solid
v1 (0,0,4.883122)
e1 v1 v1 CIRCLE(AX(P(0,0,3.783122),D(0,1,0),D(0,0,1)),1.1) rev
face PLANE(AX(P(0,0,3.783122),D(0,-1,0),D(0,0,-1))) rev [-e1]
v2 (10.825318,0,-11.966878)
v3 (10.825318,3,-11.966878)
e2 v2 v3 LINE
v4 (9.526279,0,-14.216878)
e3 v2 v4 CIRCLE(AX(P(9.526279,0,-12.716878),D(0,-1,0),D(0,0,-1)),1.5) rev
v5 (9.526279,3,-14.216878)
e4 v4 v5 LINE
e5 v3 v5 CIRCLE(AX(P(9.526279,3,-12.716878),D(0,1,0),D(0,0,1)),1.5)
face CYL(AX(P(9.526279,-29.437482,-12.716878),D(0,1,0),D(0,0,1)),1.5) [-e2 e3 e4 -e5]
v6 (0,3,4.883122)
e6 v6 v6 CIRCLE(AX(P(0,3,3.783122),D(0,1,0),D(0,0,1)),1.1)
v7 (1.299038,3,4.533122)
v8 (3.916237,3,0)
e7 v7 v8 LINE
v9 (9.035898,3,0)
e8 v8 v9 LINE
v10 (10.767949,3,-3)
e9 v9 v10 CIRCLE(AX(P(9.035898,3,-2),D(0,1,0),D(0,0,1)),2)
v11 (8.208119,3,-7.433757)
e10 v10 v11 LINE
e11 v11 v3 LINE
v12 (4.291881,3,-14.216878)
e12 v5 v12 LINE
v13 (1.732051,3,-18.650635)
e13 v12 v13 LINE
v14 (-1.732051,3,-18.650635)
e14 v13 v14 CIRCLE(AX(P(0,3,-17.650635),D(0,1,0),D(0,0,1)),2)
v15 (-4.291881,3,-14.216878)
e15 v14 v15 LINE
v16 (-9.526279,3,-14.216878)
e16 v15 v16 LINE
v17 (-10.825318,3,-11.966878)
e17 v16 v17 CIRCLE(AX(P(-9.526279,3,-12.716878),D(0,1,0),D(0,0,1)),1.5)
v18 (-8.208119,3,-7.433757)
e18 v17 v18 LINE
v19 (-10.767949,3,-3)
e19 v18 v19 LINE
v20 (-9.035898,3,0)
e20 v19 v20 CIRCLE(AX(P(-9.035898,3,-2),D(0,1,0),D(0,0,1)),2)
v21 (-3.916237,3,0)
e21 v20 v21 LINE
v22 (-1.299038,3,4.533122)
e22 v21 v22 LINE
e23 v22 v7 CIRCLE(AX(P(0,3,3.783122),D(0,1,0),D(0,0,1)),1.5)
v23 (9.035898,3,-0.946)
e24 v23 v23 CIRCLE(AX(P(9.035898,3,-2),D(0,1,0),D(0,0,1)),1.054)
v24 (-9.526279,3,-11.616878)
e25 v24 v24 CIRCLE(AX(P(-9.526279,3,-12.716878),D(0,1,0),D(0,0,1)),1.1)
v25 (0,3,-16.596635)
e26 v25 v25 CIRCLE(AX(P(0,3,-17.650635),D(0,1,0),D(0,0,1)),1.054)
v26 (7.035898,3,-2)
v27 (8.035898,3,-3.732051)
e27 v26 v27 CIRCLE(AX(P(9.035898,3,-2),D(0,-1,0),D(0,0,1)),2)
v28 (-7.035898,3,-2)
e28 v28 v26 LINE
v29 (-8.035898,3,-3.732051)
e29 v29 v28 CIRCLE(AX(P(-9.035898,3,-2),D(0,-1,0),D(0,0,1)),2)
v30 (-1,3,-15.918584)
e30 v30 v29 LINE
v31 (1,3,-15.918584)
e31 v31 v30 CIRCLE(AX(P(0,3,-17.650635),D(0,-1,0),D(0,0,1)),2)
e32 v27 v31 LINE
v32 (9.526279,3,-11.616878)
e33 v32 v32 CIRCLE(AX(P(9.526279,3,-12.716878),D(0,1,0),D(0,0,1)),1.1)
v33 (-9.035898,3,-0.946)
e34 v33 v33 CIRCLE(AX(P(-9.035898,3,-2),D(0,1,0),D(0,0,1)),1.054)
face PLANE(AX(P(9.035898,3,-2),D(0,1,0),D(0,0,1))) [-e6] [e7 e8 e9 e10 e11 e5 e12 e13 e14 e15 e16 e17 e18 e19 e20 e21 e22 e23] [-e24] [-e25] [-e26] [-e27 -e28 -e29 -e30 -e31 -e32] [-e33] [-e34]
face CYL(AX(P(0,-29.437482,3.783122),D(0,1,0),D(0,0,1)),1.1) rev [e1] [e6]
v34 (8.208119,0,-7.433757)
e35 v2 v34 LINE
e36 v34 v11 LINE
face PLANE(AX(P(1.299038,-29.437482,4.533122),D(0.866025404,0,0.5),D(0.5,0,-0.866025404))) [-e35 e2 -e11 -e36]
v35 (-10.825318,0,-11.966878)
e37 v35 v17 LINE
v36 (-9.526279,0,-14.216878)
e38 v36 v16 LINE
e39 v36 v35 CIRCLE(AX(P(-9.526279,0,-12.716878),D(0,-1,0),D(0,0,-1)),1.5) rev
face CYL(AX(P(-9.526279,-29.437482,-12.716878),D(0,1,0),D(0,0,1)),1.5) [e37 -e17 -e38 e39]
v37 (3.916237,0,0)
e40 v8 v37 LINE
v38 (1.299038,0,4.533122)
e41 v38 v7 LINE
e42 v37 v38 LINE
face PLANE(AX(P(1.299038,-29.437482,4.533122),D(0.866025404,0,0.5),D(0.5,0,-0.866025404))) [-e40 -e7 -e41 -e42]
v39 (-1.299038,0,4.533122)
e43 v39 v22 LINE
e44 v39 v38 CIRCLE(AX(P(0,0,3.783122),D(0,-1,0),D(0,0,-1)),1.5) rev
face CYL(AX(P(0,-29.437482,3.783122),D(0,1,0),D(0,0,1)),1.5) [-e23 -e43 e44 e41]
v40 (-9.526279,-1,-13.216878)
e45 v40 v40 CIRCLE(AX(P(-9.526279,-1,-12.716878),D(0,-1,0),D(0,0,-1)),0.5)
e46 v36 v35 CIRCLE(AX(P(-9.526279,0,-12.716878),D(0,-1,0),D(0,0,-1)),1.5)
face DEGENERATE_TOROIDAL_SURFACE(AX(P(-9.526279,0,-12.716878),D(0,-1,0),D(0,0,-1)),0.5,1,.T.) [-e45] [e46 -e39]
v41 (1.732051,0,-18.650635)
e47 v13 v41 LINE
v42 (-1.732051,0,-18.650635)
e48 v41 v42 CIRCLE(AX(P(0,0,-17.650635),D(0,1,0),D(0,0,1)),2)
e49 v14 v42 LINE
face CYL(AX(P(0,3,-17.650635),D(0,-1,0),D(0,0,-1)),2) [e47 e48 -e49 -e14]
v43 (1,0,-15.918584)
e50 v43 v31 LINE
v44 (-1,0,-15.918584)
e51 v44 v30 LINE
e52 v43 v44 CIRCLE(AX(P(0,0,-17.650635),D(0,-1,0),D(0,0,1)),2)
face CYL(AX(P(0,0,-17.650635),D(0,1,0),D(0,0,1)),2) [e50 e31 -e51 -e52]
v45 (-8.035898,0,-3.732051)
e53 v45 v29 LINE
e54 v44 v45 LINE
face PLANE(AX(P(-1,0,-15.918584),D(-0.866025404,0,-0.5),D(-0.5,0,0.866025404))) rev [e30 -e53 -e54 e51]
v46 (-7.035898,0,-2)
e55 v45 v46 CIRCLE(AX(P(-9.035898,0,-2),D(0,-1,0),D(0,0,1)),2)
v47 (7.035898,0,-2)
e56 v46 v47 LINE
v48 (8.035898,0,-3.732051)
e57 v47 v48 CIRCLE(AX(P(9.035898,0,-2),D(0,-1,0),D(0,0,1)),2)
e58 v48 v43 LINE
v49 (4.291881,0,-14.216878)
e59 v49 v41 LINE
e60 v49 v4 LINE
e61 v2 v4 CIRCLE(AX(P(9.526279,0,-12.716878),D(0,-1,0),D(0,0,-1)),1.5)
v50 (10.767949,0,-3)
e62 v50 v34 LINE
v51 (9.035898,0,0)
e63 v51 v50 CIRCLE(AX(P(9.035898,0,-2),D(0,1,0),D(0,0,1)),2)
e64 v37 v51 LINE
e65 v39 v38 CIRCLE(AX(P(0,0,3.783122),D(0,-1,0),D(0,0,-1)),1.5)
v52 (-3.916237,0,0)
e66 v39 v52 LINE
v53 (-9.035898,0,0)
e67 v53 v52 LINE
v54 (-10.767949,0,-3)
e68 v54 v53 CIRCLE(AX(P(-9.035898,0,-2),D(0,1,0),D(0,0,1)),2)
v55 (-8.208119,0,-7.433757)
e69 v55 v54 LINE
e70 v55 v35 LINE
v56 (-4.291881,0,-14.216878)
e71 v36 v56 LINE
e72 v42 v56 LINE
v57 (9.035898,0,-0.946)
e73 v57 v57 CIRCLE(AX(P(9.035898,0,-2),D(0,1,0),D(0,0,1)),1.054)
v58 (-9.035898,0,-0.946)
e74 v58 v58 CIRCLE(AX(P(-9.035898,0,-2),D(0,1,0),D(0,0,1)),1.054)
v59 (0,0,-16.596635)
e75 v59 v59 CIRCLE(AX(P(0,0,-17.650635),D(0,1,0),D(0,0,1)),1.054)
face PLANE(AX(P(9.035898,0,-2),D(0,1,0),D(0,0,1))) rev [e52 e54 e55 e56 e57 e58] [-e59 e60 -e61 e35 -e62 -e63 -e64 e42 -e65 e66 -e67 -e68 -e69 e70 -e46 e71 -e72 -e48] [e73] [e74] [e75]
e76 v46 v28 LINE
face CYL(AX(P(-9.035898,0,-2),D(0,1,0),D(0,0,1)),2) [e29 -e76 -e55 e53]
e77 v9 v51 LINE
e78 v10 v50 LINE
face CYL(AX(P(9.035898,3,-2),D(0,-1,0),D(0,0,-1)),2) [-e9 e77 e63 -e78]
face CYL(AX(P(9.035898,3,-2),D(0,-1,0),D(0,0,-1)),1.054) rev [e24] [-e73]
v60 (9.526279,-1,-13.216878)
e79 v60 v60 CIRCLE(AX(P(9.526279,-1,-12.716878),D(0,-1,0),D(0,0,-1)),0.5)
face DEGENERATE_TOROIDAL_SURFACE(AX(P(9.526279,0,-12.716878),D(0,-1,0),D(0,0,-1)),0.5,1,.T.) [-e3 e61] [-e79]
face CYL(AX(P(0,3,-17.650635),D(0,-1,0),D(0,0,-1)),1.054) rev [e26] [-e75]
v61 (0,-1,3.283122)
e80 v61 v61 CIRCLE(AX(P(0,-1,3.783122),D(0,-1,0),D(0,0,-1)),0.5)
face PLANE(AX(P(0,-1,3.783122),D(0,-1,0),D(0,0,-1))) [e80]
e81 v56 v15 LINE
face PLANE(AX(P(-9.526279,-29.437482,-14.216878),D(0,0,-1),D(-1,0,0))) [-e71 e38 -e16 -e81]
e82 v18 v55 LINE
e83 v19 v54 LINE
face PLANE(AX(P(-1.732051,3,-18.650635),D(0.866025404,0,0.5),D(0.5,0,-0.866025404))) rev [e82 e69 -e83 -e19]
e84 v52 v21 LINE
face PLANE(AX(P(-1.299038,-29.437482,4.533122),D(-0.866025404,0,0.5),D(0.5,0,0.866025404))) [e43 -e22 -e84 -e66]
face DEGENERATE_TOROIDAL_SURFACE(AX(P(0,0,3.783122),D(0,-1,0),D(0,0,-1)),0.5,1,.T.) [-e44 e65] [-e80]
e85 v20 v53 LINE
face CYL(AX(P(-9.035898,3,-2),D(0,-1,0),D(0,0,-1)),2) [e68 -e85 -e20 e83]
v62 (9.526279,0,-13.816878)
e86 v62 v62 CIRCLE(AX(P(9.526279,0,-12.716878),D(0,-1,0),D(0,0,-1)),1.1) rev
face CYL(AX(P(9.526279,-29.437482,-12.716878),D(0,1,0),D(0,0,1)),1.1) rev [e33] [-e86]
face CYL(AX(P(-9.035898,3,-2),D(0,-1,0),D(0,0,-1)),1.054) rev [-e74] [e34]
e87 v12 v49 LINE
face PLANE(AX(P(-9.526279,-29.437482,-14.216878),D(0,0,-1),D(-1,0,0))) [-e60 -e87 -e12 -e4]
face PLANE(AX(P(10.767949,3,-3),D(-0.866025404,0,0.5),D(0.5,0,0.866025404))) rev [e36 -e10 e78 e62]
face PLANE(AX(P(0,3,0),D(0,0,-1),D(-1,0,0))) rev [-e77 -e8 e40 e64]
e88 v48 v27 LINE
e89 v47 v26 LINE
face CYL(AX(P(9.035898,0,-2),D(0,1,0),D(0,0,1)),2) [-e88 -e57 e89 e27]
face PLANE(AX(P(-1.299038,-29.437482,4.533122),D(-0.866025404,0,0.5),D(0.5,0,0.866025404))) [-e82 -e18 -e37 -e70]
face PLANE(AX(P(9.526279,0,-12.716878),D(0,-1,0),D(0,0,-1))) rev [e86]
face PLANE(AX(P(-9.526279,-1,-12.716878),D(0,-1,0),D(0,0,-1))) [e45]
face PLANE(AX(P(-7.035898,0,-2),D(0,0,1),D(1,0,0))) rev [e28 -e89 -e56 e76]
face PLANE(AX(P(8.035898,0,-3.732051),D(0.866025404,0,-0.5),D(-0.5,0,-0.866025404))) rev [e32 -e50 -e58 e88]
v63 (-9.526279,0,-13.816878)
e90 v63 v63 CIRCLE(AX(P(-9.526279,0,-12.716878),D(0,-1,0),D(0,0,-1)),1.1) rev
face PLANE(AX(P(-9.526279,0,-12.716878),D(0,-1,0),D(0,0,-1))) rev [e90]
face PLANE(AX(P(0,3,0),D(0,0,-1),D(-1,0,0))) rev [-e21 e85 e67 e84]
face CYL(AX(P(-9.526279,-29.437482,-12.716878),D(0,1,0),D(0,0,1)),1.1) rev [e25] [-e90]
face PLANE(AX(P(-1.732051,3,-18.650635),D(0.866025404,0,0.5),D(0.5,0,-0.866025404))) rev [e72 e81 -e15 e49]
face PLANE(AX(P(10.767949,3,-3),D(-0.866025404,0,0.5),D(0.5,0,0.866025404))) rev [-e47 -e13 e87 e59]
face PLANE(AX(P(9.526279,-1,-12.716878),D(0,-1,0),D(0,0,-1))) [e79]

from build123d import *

# Parameters (mm, degrees)
SKETCH1_R           = 1.054
BOSS_EXTRUDE1_DEPTH = 3
SKETCH3_R           = 1.1
BOSS_EXTRUDE2_DEPTH = 3
CUT_EXTRUDE1_DEPTH  = 23.736281859
SKETCH4_R           = 1.5
BOSS_EXTRUDE3_DEPTH = 1
FILLET1_R           = 1


with BuildPart() as part:
    # Sketch1 → Boss-Extrude1 (new body)
    with BuildSketch(Plane(origin=(0, 0, 0), x_dir=(1, 0, 0), z_dir=(0, 1, 0))):
        with BuildLine():
            Line((0, 0), (9.035898385, 0))
            ThreePointArc((9.035898385, 0), (10.767949192, 1), (10.767949192, 3))
            Line((10.767949192, 3), (1.732050808, 18.650635095))
            ThreePointArc((1.732050808, 18.650635095), (0, 19.650635095), (-1.732050808, 18.650635095))
            Line((-1.732050808, 18.650635095), (-10.767949192, 3))
            ThreePointArc((-10.767949192, 3), (-10.767949192, 1), (-9.035898385, 0))
            Line((-9.035898385, 0), (0, 0))
        make_face()
        with Locations(Location((0, 17.650635095, 0), (0, 0, 270))):
            Circle(SKETCH1_R, mode=Mode.SUBTRACT)
        with Locations(Location((-9.035898385, 2, 0), (0, 0, 270))):
            Circle(SKETCH1_R, mode=Mode.SUBTRACT)
        with Locations(Location((9.035898385, 2, 0), (0, 0, 270))):
            Circle(SKETCH1_R, mode=Mode.SUBTRACT)
    extrude(amount=BOSS_EXTRUDE1_DEPTH)

    # Sketch3 → Boss-Extrude2 (add)
    with BuildSketch(Plane(origin=(0, 3, 0), x_dir=(1, 0, 0), z_dir=(0, 1, 0))):
        with BuildLine():
            Line((-9.526279442, 14.216878365), (9.526279442, 14.216878365))
            ThreePointArc((9.526279442, 14.216878365), (10.825317547, 13.466878365), (10.825317547, 11.966878365))
            Line((10.825317547, 11.966878365), (1.299038106, -4.533121635))
            ThreePointArc((1.299038106, -4.533121635), (0, -5.283121635), (-1.299038106, -4.533121635))
            Line((-1.299038106, -4.533121635), (-10.825317547, 11.966878365))
            ThreePointArc((-10.825317547, 11.966878365), (-10.825317547, 13.466878365), (-9.526279442, 14.216878365))
        make_face()
        with Locations(Location((0, -3.783121635, 0), (0, 0, 270))):
            Circle(SKETCH3_R, mode=Mode.SUBTRACT)
        with Locations(Location((-9.526279442, 12.716878365, 0), (0, 0, 270))):
            Circle(SKETCH3_R, mode=Mode.SUBTRACT)
        with Locations(Location((9.526279442, 12.716878365, 0), (0, 0, 270))):
            Circle(SKETCH3_R, mode=Mode.SUBTRACT)
    extrude(amount=-BOSS_EXTRUDE2_DEPTH)

    # Sketch2 → Cut-Extrude1 (cut, through all)
    with BuildSketch(Plane(origin=(0, 3, 0), x_dir=(1, 0, 0), z_dir=(0, 1, 0))):
        with BuildLine():
            Line((-1, 15.918584287), (-8.035898385, 3.732050808))
            ThreePointArc((-8.035898385, 3.732050808), (-7.303847577, 3), (-7.035898385, 2))
            Line((-7.035898385, 2), (7.035898385, 2))
            ThreePointArc((7.035898385, 2), (7.303847577, 3), (8.035898385, 3.732050808))
            Line((8.035898385, 3.732050808), (1, 15.918584287))
            ThreePointArc((1, 15.918584287), (0, 15.650635095), (-1, 15.918584287))
        make_face()
    extrude(amount=-CUT_EXTRUDE1_DEPTH, mode=Mode.SUBTRACT)

    # Sketch4 → Boss-Extrude3 (add)
    with BuildSketch(Plane.XZ):
        with Locations(Location((0, 3.783121635, 0), (0, 0, 30))):
            Circle(SKETCH4_R)
        with Locations(Location((9.526279442, -12.716878365, 0), (0, 0, 270))):
            Circle(SKETCH4_R)
        with Locations(Location((-9.526279442, -12.716878365, 0), (0, 0, 270))):
            Circle(SKETCH4_R)
    extrude(amount=BOSS_EXTRUDE3_DEPTH)

    # Fillet1
    fillet1_edges = [part.edges().sort_by_distance(p)[0] for p in [
        (-1.299038106, -1, 3.033121635),
        (9.526279442, -1, -11.216878365),
        (-9.526279442, -1, -11.216878365),
    ]]
    fillet(fillet1_edges, radius=FILLET1_R - 0.0001)  # a hair under: the kernel refuses the full size


solid = part.part
